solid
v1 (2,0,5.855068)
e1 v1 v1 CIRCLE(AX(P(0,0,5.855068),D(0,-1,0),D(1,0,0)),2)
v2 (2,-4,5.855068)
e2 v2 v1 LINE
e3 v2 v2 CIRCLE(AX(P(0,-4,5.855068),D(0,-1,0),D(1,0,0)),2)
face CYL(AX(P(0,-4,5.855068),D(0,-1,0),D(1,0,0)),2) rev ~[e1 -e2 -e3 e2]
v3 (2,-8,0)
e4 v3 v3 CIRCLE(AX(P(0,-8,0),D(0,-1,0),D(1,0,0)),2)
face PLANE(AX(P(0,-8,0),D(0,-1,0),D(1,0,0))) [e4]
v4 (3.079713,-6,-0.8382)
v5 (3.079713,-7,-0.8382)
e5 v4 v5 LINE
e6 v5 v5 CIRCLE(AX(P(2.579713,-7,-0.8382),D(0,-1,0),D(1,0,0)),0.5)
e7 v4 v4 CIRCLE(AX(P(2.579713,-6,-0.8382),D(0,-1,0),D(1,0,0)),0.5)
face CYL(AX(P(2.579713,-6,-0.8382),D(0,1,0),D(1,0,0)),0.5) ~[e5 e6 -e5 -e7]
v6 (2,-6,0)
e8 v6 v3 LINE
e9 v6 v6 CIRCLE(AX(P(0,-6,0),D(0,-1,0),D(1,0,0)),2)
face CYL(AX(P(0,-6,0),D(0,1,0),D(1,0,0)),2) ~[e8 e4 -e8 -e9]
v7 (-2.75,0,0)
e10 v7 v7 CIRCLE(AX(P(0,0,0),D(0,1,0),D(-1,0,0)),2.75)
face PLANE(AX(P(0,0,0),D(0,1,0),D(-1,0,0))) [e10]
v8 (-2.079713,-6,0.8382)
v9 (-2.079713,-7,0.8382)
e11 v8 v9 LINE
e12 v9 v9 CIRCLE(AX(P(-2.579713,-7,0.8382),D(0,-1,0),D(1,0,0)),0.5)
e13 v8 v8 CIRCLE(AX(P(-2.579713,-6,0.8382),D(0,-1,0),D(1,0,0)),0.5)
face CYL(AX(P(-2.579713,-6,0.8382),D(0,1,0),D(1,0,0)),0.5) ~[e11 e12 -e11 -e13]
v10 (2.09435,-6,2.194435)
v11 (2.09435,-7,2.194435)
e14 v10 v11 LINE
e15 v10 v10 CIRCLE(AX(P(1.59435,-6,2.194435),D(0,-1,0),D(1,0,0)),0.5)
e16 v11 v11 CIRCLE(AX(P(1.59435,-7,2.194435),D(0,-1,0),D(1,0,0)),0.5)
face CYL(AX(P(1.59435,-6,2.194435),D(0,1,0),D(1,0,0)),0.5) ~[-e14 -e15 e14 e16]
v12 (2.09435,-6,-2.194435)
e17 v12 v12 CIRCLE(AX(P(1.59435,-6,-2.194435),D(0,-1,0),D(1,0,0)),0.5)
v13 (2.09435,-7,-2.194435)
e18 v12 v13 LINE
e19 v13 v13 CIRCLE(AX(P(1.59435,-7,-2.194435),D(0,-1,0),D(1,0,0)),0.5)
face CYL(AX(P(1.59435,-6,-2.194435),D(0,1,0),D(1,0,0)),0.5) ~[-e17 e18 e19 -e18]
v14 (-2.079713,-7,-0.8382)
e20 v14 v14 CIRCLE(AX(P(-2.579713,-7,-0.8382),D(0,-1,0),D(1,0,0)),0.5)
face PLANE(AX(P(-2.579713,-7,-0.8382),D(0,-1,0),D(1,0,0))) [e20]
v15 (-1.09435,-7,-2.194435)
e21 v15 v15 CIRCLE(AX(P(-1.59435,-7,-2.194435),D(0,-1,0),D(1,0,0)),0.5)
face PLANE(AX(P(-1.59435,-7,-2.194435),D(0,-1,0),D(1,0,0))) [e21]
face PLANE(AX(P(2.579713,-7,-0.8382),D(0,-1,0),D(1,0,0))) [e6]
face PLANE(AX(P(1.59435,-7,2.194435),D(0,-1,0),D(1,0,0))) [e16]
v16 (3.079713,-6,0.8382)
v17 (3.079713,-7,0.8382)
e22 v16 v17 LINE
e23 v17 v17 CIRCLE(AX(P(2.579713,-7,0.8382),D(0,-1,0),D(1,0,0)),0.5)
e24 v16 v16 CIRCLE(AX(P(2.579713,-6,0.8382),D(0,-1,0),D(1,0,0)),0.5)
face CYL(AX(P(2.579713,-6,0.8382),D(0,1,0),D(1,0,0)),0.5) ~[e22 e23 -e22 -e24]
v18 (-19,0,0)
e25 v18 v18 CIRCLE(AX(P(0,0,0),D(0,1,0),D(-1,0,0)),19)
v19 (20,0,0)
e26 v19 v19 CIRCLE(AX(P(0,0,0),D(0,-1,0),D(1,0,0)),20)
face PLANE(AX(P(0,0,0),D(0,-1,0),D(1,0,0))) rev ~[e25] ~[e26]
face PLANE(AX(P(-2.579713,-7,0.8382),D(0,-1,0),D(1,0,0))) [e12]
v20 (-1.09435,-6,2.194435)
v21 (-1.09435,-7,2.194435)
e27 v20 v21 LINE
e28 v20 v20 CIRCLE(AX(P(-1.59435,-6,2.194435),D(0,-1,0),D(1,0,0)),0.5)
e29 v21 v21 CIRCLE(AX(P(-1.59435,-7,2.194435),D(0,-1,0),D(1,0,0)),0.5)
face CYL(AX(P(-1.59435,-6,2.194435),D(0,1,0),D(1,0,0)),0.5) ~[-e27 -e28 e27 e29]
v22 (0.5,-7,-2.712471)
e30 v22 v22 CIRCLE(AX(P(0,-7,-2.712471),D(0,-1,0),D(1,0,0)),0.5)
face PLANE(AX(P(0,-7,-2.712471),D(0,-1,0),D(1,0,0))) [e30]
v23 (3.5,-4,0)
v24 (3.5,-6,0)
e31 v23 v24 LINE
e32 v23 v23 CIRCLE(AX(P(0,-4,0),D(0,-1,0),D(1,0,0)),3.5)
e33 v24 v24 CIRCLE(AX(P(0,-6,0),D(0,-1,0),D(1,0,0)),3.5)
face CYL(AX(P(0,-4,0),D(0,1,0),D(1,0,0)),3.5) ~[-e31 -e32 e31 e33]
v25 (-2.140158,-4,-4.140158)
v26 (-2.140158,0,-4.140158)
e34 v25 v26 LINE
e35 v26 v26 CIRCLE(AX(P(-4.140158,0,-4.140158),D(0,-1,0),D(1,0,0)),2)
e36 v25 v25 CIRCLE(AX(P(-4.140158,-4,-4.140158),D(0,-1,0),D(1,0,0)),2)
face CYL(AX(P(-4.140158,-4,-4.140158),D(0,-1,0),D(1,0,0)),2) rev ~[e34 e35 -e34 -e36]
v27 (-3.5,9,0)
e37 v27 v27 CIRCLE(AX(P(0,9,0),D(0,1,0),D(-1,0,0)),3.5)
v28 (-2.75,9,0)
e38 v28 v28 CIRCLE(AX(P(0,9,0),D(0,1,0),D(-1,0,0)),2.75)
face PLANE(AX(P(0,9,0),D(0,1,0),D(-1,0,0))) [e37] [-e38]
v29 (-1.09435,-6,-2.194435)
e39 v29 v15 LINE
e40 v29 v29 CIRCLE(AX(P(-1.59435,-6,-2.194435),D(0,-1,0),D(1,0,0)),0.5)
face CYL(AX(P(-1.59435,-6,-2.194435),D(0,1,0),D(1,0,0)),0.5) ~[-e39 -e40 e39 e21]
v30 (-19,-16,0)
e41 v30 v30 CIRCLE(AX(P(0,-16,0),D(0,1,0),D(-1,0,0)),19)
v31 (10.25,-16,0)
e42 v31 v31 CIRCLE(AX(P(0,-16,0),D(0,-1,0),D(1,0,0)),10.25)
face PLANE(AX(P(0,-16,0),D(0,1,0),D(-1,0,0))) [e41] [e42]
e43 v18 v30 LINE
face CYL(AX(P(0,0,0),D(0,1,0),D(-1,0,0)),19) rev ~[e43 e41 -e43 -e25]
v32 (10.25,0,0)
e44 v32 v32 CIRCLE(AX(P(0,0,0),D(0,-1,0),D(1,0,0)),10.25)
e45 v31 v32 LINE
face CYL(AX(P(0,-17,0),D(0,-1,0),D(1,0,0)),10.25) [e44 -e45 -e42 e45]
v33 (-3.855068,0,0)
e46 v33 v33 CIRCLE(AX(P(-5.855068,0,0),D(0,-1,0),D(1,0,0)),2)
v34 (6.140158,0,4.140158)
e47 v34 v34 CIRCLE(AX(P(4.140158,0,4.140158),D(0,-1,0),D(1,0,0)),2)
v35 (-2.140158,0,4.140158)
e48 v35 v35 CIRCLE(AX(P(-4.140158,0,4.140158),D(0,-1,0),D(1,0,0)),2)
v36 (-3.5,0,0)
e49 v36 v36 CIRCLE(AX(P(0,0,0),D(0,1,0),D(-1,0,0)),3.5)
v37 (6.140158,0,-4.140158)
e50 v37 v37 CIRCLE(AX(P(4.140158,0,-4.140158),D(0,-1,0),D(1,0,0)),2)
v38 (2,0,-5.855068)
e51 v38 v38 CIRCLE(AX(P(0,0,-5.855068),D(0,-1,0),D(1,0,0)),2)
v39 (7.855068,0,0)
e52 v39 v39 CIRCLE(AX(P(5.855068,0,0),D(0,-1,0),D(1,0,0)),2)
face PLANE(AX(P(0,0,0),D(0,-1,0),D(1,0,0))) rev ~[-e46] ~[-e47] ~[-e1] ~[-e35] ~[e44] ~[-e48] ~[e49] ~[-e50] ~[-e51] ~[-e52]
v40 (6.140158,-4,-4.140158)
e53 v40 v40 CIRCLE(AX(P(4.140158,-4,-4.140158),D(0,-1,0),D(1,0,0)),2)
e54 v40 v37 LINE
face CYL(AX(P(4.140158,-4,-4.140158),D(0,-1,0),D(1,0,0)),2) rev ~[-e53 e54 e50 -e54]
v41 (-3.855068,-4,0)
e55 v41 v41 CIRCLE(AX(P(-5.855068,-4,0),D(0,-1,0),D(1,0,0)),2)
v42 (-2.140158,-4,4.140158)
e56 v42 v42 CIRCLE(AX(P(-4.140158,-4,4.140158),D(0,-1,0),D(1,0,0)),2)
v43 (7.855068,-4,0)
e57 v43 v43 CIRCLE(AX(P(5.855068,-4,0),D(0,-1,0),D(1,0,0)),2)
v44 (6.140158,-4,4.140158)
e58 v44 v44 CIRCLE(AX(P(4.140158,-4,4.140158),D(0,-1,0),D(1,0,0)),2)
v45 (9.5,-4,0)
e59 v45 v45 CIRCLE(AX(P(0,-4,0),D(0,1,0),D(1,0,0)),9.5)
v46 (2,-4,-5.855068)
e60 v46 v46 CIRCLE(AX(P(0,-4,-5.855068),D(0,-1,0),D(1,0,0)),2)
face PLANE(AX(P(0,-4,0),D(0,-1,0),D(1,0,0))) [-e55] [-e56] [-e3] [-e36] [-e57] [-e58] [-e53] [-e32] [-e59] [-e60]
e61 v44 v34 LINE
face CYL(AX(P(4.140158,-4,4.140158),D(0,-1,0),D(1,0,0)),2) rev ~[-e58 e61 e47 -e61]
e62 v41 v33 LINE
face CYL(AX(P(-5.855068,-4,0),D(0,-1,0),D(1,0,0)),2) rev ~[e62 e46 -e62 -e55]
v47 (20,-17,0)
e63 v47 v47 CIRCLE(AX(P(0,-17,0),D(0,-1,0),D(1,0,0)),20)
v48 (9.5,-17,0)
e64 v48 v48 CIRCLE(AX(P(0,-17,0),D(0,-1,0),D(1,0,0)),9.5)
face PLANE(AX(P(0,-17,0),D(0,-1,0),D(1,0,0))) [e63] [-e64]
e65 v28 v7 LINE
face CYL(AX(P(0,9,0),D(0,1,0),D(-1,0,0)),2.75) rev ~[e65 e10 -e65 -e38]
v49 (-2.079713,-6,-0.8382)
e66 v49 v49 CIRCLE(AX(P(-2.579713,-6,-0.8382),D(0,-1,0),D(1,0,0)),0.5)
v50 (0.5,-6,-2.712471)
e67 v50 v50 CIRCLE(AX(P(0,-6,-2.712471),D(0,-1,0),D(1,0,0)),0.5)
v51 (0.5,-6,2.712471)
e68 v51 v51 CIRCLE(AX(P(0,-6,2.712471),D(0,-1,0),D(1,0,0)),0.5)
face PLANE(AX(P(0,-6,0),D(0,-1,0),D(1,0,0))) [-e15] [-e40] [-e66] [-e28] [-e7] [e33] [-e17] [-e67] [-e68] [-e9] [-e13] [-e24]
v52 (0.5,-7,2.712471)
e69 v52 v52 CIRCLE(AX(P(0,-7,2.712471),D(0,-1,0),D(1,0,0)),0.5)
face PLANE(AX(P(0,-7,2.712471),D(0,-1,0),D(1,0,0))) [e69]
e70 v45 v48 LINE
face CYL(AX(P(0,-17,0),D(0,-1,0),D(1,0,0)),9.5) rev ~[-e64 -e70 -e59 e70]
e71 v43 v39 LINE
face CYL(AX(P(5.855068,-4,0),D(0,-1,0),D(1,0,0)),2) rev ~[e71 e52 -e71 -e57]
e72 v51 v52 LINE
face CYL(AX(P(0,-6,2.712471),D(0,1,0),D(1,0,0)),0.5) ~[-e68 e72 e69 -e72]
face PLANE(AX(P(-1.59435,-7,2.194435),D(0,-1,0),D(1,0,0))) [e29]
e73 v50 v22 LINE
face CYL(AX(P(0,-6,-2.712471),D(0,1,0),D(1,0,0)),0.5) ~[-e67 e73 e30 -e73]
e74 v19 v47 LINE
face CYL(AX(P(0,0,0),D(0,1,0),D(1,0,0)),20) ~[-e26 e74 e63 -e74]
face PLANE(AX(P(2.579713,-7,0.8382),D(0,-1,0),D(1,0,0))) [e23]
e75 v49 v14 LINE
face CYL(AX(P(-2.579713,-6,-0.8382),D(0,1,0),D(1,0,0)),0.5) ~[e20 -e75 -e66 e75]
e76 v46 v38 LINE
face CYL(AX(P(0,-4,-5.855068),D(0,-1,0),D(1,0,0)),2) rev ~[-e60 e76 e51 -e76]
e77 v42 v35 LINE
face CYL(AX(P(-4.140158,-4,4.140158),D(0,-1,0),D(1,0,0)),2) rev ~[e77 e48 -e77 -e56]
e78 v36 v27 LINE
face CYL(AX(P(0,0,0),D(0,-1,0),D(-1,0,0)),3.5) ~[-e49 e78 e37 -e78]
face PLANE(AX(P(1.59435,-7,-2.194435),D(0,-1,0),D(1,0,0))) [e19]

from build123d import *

# Parameters (mm, degrees)
F0_R      = 20
F1_DEPTH  = 17
F2_R      = 9.5
F3_DEPTH  = 13
F4_R      = 2
F5_DEPTH  = 4
F6_R      = 3.5
F7_DEPTH  = 2
F8_R      = 2
F9_DEPTH  = 2
F10_R     = 0.5
F11_DEPTH = 1
F12_R     = 3.5
F13_DEPTH = 9
F14_R     = 2.75
F15_DEPTH = 9
F16_R     = 19
F16_R_2   = 9.5
F17_DEPTH = 16
F18_R     = 10.25
F18_R_2   = 9.5
F19_DEPTH = 17


# Not quite as in the source:
# - a feature names something its author has since deleted; it is built from what else it names


with BuildPart() as f1:
    # F0 (on Front) → F1 (new body)
    with BuildSketch(Plane.XZ):
        Circle(F0_R)
    extrude(amount=F1_DEPTH)

    # F2 (on face) → F3 (cut)
    with BuildSketch(Plane.XZ.offset(17)):
        Circle(F2_R)
    extrude(amount=-F3_DEPTH, mode=Mode.SUBTRACT)

    # F4 (on face) → F5 (cut)
    with BuildSketch(Plane.XZ.offset(4)):
        with Locations((-4.1401582032, 4.1401582032)):
            Circle(F4_R)
        with Locations((0, 5.8550678814)):
            Circle(F4_R)
        with Locations((4.1401582032, 4.1401582032)):
            Circle(F4_R)
        with Locations((5.8550678814, 0)):
            Circle(F4_R)
        with Locations((4.1401582032, -4.1401582032)):
            Circle(F4_R)
        with Locations((0, -5.8550678814)):
            Circle(F4_R)
        with Locations((-4.1401582032, -4.1401582032)):
            Circle(F4_R)
        with Locations((-5.8550678814, 0)):
            Circle(F4_R)
    extrude(amount=-F5_DEPTH, mode=Mode.SUBTRACT)

    # F6 (on face) → F7 (join)
    with BuildSketch(Plane.XZ.offset(4)):
        Circle(F6_R)
    extrude(amount=F7_DEPTH)

    # F8 (on face) → F9 (join)
    with BuildSketch(Plane.XZ.offset(6)):
        Circle(F8_R)
    extrude(amount=F9_DEPTH)

    # F10 (on face) → F11 (join)
    with BuildSketch(Plane.XZ.offset(6)):
        with Locations((0, 2.7124709893)):
            Circle(F10_R)
        with Locations((1.5943504448, 2.1944351271)):
            Circle(F10_R)
        with Locations((2.5797132096, 0.8381996324)):
            Circle(F10_R)
        with Locations((2.5797132096, -0.8381996324)):
            Circle(F10_R)
        with Locations((1.5943504448, -2.1944351271)):
            Circle(F10_R)
        with Locations((0, -2.7124709893)):
            Circle(F10_R)
        with Locations((-1.5943504448, -2.1944351271)):
            Circle(F10_R)
        with Locations((-2.5797132096, -0.8381996324)):
            Circle(F10_R)
        with Locations((-2.5797132096, 0.8381996324)):
            Circle(F10_R)
        with Locations((-1.5943504448, 2.1944351271)):
            Circle(F10_R)
    extrude(amount=F11_DEPTH)

    # F12 (on face) → F13 (join)
    with BuildSketch(Plane(origin=(0, 0, 0), x_dir=(-1, 0, 0), z_dir=(0, 1, 0))):
        Circle(F12_R)
    extrude(amount=F13_DEPTH)

    # F14 (on face) → F15 (cut)
    with BuildSketch(Plane(origin=(0, 9, 0), x_dir=(-1, 0, 0), z_dir=(0, 1, 0))):
        Circle(F14_R)
    extrude(amount=-F15_DEPTH, mode=Mode.SUBTRACT)

    # F16 (on face) → F17 (cut)
    with BuildSketch(Plane(origin=(0, 0, 0), x_dir=(-1, 0, 0), z_dir=(0, 1, 0))):
        Circle(F16_R)
        Circle(F16_R_2, mode=Mode.SUBTRACT)
    extrude(amount=-F17_DEPTH, mode=Mode.SUBTRACT)

    # F18 (on face) → F19 (join)
    with BuildSketch(Plane.XZ.offset(17)):
        Circle(F18_R)
        Circle(F18_R_2, mode=Mode.SUBTRACT)
    extrude(amount=-F19_DEPTH)


solid = f1.part
